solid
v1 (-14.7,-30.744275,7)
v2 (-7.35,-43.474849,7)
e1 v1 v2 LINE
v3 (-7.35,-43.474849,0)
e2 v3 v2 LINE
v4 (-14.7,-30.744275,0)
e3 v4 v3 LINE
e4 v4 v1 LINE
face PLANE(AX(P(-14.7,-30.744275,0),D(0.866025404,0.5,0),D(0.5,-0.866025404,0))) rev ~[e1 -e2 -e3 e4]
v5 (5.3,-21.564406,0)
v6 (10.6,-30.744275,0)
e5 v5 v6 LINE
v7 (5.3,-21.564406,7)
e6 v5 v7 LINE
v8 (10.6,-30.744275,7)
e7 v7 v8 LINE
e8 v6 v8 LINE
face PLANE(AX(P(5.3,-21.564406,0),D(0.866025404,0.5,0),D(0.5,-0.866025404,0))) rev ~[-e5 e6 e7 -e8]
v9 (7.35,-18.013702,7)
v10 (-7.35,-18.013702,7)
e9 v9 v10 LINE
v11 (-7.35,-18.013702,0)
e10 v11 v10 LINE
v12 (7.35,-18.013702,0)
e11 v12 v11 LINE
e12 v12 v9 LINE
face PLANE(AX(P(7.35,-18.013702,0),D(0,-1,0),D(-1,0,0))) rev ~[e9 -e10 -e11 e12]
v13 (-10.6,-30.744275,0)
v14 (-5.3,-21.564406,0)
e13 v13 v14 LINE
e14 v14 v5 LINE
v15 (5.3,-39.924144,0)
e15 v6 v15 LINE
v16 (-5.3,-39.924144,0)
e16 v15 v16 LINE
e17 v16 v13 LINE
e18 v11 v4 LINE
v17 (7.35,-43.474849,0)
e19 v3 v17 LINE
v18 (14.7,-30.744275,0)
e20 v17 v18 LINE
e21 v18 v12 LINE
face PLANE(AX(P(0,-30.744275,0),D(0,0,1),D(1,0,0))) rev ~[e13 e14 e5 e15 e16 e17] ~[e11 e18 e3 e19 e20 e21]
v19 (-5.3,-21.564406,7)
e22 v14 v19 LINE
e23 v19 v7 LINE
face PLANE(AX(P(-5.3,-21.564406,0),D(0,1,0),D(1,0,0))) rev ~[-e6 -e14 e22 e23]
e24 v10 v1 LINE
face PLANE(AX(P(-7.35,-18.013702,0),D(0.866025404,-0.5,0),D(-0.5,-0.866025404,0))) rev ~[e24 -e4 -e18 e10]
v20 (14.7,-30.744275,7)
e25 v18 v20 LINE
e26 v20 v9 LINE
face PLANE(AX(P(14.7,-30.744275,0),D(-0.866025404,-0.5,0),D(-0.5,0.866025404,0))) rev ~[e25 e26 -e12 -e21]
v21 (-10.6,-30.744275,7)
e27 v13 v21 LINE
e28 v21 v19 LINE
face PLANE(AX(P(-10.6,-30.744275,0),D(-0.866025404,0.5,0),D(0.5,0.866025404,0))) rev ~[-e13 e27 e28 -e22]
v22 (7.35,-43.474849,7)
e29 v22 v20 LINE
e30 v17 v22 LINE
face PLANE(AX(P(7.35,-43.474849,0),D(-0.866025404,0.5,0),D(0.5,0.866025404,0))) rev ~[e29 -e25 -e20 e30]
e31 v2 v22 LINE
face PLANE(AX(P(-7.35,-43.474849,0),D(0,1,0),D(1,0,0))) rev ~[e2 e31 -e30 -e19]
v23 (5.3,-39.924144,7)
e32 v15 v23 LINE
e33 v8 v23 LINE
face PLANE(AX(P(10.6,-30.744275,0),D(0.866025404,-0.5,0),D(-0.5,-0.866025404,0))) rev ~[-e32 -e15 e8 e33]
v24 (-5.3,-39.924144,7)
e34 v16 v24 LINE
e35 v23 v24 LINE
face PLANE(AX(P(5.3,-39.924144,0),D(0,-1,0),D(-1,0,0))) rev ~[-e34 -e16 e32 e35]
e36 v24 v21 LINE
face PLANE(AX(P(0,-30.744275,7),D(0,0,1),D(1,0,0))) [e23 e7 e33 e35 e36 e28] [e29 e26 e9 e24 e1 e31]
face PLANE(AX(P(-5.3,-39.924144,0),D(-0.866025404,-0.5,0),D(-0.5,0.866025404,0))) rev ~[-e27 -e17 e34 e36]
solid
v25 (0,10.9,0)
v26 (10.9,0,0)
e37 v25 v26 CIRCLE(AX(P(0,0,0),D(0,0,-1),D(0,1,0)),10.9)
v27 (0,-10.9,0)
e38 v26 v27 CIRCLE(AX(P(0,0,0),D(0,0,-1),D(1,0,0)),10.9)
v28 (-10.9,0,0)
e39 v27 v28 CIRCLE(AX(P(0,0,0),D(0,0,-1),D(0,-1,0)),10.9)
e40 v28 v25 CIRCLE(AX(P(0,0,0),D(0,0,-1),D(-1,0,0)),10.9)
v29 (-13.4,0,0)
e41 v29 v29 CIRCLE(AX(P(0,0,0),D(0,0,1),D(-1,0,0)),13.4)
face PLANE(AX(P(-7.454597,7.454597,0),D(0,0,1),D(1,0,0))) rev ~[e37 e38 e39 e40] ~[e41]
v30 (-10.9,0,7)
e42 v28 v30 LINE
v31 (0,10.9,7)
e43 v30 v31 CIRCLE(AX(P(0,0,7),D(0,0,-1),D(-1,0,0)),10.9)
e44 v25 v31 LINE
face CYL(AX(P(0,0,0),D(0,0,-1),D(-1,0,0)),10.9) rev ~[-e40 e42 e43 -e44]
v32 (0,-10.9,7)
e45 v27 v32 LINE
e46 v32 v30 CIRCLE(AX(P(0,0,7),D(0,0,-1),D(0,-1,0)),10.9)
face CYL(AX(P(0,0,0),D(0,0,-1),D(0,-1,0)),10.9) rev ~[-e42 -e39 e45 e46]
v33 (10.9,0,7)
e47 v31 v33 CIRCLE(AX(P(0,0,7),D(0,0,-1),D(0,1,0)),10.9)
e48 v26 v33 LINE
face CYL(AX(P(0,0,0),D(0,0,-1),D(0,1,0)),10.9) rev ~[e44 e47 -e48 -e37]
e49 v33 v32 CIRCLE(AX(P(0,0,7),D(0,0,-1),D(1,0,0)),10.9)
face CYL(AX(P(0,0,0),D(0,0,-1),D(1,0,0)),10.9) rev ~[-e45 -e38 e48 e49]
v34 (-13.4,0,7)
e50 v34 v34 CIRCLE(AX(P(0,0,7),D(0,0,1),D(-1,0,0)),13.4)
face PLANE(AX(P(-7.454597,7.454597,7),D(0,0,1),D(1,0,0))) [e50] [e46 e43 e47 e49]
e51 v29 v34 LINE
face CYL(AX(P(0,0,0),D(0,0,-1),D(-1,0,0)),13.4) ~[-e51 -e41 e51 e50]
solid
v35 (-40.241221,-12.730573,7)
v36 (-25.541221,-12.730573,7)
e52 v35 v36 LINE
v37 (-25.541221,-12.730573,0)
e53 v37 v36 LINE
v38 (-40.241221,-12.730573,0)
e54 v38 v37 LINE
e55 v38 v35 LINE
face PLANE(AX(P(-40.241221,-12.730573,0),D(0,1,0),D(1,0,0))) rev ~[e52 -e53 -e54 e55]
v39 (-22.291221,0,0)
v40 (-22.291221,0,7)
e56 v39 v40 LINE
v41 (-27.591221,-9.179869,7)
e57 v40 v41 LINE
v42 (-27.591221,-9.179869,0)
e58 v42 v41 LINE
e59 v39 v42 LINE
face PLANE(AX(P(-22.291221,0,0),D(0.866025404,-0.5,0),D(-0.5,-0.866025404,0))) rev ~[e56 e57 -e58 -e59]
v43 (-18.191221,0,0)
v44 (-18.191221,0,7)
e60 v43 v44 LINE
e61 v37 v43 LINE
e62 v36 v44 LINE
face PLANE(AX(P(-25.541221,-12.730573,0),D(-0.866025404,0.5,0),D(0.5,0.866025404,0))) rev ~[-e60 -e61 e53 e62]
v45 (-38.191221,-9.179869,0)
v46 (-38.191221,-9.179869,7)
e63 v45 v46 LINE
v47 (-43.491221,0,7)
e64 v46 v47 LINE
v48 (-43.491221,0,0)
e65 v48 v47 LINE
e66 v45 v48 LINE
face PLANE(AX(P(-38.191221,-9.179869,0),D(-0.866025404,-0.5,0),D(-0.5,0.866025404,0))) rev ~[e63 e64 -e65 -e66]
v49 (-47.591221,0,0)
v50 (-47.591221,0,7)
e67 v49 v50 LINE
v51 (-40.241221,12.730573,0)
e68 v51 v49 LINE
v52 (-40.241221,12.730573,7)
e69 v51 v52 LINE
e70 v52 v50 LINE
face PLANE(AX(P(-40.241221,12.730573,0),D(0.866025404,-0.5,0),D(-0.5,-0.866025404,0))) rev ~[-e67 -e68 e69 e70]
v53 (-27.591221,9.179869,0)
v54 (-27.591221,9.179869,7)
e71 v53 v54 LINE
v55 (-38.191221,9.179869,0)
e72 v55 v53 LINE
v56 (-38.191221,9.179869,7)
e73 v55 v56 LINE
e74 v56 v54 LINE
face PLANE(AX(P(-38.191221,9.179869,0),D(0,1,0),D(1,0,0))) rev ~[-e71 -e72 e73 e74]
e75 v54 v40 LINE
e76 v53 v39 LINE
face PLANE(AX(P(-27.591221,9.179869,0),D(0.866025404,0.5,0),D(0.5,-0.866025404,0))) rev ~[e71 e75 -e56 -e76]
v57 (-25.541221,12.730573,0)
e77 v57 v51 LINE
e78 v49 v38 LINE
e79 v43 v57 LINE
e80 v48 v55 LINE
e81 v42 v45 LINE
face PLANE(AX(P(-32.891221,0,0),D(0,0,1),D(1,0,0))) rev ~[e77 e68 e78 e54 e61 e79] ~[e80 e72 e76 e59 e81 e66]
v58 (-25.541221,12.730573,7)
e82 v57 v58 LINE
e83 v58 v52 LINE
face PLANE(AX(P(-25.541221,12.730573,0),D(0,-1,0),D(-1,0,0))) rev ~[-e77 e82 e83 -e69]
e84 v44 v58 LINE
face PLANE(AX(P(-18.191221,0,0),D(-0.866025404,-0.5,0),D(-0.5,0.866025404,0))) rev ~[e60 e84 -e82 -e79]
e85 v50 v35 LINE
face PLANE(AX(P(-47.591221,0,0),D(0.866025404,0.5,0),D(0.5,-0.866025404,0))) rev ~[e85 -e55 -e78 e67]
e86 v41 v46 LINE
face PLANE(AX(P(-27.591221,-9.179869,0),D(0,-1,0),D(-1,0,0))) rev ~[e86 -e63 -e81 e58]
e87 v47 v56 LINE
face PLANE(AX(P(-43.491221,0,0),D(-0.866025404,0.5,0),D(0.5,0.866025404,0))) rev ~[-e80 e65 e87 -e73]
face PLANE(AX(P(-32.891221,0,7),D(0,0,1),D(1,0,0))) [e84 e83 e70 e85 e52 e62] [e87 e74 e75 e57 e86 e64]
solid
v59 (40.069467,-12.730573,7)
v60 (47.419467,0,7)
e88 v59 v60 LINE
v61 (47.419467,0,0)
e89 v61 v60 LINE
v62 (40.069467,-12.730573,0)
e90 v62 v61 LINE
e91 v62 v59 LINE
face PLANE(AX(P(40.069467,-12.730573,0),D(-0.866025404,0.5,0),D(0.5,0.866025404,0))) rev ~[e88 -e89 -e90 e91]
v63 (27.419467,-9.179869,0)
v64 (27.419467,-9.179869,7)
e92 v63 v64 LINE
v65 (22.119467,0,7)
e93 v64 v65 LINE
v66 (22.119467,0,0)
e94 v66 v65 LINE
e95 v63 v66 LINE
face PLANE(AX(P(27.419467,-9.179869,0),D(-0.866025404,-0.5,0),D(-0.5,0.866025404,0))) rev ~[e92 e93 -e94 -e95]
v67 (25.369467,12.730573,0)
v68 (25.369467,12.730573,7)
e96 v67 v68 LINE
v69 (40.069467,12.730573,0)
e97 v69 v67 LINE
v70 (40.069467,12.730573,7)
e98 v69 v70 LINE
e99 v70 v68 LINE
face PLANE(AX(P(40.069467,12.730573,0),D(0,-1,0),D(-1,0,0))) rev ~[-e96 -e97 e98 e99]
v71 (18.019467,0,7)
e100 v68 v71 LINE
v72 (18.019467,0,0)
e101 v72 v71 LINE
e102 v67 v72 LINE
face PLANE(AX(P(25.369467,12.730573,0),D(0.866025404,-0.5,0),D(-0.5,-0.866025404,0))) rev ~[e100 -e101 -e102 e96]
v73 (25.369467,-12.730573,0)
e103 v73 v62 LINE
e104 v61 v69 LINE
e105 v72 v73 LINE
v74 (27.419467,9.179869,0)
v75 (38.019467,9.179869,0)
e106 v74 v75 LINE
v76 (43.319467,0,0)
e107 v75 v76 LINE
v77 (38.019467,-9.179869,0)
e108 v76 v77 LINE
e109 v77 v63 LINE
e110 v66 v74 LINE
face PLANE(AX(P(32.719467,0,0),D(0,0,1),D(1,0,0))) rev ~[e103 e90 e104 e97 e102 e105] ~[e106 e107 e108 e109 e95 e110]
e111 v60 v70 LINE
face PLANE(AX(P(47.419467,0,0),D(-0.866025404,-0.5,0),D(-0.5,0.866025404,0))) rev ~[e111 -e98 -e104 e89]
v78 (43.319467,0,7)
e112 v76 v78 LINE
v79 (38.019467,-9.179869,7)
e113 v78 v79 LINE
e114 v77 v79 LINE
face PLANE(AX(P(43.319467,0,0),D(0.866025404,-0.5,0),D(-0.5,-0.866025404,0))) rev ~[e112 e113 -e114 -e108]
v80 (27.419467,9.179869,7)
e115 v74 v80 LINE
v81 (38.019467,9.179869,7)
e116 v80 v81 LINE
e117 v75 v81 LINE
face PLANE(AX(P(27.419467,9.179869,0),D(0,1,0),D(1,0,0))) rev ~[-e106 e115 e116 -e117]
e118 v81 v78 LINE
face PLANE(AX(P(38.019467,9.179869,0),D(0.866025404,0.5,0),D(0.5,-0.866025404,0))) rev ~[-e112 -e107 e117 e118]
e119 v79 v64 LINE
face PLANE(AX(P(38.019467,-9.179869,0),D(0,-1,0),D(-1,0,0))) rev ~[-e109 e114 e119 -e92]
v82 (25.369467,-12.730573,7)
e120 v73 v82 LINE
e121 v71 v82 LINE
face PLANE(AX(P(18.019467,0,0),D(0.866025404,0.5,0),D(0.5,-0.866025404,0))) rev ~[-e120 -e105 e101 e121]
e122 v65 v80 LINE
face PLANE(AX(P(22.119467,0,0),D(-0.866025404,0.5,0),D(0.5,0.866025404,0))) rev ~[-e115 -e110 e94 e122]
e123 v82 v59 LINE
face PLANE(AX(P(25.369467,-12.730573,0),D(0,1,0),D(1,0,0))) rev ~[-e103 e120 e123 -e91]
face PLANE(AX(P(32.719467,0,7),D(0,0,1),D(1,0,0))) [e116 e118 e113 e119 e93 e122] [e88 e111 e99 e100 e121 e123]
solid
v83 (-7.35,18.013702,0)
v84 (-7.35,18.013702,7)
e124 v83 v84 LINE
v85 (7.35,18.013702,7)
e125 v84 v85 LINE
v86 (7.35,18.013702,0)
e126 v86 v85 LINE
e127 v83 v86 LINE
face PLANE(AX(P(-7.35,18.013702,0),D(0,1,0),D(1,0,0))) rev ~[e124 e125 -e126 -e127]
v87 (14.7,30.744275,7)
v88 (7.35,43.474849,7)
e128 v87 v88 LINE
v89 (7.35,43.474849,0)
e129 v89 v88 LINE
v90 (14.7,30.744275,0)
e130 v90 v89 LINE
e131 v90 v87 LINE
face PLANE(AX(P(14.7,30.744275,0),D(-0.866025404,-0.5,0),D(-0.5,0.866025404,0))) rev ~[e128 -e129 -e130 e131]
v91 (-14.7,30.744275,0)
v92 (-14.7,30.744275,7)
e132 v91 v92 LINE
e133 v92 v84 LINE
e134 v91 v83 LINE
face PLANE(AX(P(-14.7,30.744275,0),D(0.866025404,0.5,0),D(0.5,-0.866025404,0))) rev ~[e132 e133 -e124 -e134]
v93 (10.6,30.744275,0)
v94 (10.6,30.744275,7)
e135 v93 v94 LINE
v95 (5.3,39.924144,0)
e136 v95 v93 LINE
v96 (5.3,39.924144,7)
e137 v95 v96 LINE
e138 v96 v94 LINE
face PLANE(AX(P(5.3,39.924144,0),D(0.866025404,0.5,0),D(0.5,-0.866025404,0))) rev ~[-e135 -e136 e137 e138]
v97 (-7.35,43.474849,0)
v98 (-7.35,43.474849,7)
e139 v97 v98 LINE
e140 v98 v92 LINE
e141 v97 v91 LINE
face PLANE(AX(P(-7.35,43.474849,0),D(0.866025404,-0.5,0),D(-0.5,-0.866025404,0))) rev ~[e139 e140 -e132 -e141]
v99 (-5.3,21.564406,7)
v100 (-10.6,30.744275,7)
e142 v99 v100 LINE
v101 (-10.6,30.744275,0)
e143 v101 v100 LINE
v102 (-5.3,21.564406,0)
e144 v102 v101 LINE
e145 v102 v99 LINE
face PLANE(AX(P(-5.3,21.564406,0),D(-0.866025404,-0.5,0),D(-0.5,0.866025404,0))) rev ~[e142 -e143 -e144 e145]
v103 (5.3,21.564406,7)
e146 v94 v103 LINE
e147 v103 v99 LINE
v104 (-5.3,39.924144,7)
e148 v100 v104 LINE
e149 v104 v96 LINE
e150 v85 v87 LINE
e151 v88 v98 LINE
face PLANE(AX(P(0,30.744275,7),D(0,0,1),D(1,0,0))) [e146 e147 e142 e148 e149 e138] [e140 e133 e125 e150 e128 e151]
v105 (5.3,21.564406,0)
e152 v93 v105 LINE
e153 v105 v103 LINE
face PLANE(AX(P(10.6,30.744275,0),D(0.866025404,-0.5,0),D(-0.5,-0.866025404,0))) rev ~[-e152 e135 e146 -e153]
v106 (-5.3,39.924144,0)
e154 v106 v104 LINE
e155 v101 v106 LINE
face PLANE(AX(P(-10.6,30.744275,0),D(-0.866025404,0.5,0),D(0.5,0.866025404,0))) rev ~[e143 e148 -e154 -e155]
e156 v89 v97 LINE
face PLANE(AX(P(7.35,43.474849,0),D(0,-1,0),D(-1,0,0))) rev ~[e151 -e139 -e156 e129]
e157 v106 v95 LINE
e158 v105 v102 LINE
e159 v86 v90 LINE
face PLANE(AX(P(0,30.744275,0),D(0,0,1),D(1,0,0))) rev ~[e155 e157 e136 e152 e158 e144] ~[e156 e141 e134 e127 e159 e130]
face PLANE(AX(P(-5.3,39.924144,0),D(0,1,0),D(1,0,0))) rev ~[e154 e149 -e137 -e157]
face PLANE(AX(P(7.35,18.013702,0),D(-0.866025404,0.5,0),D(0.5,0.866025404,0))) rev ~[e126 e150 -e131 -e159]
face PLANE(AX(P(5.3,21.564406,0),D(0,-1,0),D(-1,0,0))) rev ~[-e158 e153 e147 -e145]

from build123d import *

# Parameters (mm, degrees)
F1_DEPTH = 7


# Not quite as in the source:
# - a feature names something its author has since deleted; it is built from what else it names


with BuildPart() as f1:
    # F0 (on Top) → F1 (new body)
    with BuildSketch(Plane.XY):
        Polygon((-25.5412213445, 12.7305734356), (-40.2412213445, 12.7305734356), (-47.5912213445, 0), (-40.2412213445, -12.7305734356), (-25.5412213445, -12.7305734356), (-18.1912213445, 0), align=None)
        Polygon((-43.4912213445, 0), (-38.1912213445, 9.1798692801), (-27.5912213445, 9.1798692801), (-22.2912213445, 0), (-27.5912213445, -9.1798692801), (-38.1912213445, -9.1798692801), align=None, mode=Mode.SUBTRACT)
    extrude(amount=F1_DEPTH)


with BuildPart() as f1b:
    # F0 (on Top) → F1, piece 2 (new body)
    with BuildSketch(Plane.XY):
        with BuildLine():
            ThreePointArc((-10.9, 0), (-7.7074639149, 7.7074639149), (0, 10.9))
            Line((0, 10.9), (0, 13.4))
            ThreePointArc((0, 13.4), (-9.4752308679, 9.4752308679), (-13.4, 0))
            Line((-13.4, 0), (-10.9, 0))
        make_face()
        with BuildLine():
            ThreePointArc((0, 10.9), (7.7074639149, 7.7074639149), (10.9, 0))
            Line((10.9, 0), (13.4, 0))
            ThreePointArc((13.4, 0), (9.4752308679, 9.4752308679), (0, 13.4))
            Line((0, 13.4), (0, 10.9))
        make_face()
        with BuildLine():
            Line((13.4, 0), (10.9, 0))
            ThreePointArc((10.9, 0), (7.7074639149, -7.7074639149), (0, -10.9))
            Line((0, -10.9), (0, -13.4))
            ThreePointArc((0, -13.4), (9.4752308679, -9.4752308679), (13.4, 0))
        make_face()
        with BuildLine():
            Line((0, -13.4), (0, -10.9))
            ThreePointArc((0, -10.9), (-7.7074639149, -7.7074639149), (-10.9, 0))
            Line((-10.9, 0), (-13.4, 0))
            ThreePointArc((-13.4, 0), (-9.4752308679, -9.4752308679), (0, -13.4))
        make_face()
    extrude(amount=F1_DEPTH)


with BuildPart() as f1c:
    # F0 (on Top) → F1, piece 3 (new body)
    with BuildSketch(Plane.XY):
        Polygon((7.35, -18.0137016425), (-7.35, -18.0137016425), (-14.7, -30.7442750782), (-7.35, -43.4748485138), (7.35, -43.4748485138), (14.7, -30.7442750782), align=None)
        Polygon((-10.6, -30.7442750782), (-5.3, -21.5644057981), (5.3, -21.5644057981), (10.6, -30.7442750782), (5.3, -39.9241443583), (-5.3, -39.9241443583), align=None, mode=Mode.SUBTRACT)
    extrude(amount=F1_DEPTH)


with BuildPart() as f1d:
    # F0 (on Top) → F1, piece 4 (new body)
    with BuildSketch(Plane.XY):
        Polygon((40.0694668353, 12.7305734356), (25.3694668353, 12.7305734356), (18.0194668353, 0), (25.3694668353, -12.7305734356), (40.0694668353, -12.7305734356), (47.4194668353, 0), align=None)
        Polygon((22.1194668353, 0), (27.4194668353, 9.1798692801), (38.0194668353, 9.1798692801), (43.3194668353, 0), (38.0194668353, -9.1798692801), (27.4194668353, -9.1798692801), align=None, mode=Mode.SUBTRACT)
    extrude(amount=F1_DEPTH)


with BuildPart() as f1e:
    # F0 (on Top) → F1, piece 5 (new body)
    with BuildSketch(Plane.XY):
        Polygon((7.35, 43.4748485138), (-7.35, 43.4748485138), (-14.7, 30.7442750782), (-7.35, 18.0137016425), (7.35, 18.0137016425), (14.7, 30.7442750782), align=None)
        Polygon((-10.6, 30.7442750782), (-5.3, 39.9241443583), (5.3, 39.9241443583), (10.6, 30.7442750782), (5.3, 21.5644057981), (-5.3, 21.5644057981), align=None, mode=Mode.SUBTRACT)
    extrude(amount=F1_DEPTH)


solid = Compound([f1.part, f1b.part, f1c.part, f1d.part, f1e.part])
